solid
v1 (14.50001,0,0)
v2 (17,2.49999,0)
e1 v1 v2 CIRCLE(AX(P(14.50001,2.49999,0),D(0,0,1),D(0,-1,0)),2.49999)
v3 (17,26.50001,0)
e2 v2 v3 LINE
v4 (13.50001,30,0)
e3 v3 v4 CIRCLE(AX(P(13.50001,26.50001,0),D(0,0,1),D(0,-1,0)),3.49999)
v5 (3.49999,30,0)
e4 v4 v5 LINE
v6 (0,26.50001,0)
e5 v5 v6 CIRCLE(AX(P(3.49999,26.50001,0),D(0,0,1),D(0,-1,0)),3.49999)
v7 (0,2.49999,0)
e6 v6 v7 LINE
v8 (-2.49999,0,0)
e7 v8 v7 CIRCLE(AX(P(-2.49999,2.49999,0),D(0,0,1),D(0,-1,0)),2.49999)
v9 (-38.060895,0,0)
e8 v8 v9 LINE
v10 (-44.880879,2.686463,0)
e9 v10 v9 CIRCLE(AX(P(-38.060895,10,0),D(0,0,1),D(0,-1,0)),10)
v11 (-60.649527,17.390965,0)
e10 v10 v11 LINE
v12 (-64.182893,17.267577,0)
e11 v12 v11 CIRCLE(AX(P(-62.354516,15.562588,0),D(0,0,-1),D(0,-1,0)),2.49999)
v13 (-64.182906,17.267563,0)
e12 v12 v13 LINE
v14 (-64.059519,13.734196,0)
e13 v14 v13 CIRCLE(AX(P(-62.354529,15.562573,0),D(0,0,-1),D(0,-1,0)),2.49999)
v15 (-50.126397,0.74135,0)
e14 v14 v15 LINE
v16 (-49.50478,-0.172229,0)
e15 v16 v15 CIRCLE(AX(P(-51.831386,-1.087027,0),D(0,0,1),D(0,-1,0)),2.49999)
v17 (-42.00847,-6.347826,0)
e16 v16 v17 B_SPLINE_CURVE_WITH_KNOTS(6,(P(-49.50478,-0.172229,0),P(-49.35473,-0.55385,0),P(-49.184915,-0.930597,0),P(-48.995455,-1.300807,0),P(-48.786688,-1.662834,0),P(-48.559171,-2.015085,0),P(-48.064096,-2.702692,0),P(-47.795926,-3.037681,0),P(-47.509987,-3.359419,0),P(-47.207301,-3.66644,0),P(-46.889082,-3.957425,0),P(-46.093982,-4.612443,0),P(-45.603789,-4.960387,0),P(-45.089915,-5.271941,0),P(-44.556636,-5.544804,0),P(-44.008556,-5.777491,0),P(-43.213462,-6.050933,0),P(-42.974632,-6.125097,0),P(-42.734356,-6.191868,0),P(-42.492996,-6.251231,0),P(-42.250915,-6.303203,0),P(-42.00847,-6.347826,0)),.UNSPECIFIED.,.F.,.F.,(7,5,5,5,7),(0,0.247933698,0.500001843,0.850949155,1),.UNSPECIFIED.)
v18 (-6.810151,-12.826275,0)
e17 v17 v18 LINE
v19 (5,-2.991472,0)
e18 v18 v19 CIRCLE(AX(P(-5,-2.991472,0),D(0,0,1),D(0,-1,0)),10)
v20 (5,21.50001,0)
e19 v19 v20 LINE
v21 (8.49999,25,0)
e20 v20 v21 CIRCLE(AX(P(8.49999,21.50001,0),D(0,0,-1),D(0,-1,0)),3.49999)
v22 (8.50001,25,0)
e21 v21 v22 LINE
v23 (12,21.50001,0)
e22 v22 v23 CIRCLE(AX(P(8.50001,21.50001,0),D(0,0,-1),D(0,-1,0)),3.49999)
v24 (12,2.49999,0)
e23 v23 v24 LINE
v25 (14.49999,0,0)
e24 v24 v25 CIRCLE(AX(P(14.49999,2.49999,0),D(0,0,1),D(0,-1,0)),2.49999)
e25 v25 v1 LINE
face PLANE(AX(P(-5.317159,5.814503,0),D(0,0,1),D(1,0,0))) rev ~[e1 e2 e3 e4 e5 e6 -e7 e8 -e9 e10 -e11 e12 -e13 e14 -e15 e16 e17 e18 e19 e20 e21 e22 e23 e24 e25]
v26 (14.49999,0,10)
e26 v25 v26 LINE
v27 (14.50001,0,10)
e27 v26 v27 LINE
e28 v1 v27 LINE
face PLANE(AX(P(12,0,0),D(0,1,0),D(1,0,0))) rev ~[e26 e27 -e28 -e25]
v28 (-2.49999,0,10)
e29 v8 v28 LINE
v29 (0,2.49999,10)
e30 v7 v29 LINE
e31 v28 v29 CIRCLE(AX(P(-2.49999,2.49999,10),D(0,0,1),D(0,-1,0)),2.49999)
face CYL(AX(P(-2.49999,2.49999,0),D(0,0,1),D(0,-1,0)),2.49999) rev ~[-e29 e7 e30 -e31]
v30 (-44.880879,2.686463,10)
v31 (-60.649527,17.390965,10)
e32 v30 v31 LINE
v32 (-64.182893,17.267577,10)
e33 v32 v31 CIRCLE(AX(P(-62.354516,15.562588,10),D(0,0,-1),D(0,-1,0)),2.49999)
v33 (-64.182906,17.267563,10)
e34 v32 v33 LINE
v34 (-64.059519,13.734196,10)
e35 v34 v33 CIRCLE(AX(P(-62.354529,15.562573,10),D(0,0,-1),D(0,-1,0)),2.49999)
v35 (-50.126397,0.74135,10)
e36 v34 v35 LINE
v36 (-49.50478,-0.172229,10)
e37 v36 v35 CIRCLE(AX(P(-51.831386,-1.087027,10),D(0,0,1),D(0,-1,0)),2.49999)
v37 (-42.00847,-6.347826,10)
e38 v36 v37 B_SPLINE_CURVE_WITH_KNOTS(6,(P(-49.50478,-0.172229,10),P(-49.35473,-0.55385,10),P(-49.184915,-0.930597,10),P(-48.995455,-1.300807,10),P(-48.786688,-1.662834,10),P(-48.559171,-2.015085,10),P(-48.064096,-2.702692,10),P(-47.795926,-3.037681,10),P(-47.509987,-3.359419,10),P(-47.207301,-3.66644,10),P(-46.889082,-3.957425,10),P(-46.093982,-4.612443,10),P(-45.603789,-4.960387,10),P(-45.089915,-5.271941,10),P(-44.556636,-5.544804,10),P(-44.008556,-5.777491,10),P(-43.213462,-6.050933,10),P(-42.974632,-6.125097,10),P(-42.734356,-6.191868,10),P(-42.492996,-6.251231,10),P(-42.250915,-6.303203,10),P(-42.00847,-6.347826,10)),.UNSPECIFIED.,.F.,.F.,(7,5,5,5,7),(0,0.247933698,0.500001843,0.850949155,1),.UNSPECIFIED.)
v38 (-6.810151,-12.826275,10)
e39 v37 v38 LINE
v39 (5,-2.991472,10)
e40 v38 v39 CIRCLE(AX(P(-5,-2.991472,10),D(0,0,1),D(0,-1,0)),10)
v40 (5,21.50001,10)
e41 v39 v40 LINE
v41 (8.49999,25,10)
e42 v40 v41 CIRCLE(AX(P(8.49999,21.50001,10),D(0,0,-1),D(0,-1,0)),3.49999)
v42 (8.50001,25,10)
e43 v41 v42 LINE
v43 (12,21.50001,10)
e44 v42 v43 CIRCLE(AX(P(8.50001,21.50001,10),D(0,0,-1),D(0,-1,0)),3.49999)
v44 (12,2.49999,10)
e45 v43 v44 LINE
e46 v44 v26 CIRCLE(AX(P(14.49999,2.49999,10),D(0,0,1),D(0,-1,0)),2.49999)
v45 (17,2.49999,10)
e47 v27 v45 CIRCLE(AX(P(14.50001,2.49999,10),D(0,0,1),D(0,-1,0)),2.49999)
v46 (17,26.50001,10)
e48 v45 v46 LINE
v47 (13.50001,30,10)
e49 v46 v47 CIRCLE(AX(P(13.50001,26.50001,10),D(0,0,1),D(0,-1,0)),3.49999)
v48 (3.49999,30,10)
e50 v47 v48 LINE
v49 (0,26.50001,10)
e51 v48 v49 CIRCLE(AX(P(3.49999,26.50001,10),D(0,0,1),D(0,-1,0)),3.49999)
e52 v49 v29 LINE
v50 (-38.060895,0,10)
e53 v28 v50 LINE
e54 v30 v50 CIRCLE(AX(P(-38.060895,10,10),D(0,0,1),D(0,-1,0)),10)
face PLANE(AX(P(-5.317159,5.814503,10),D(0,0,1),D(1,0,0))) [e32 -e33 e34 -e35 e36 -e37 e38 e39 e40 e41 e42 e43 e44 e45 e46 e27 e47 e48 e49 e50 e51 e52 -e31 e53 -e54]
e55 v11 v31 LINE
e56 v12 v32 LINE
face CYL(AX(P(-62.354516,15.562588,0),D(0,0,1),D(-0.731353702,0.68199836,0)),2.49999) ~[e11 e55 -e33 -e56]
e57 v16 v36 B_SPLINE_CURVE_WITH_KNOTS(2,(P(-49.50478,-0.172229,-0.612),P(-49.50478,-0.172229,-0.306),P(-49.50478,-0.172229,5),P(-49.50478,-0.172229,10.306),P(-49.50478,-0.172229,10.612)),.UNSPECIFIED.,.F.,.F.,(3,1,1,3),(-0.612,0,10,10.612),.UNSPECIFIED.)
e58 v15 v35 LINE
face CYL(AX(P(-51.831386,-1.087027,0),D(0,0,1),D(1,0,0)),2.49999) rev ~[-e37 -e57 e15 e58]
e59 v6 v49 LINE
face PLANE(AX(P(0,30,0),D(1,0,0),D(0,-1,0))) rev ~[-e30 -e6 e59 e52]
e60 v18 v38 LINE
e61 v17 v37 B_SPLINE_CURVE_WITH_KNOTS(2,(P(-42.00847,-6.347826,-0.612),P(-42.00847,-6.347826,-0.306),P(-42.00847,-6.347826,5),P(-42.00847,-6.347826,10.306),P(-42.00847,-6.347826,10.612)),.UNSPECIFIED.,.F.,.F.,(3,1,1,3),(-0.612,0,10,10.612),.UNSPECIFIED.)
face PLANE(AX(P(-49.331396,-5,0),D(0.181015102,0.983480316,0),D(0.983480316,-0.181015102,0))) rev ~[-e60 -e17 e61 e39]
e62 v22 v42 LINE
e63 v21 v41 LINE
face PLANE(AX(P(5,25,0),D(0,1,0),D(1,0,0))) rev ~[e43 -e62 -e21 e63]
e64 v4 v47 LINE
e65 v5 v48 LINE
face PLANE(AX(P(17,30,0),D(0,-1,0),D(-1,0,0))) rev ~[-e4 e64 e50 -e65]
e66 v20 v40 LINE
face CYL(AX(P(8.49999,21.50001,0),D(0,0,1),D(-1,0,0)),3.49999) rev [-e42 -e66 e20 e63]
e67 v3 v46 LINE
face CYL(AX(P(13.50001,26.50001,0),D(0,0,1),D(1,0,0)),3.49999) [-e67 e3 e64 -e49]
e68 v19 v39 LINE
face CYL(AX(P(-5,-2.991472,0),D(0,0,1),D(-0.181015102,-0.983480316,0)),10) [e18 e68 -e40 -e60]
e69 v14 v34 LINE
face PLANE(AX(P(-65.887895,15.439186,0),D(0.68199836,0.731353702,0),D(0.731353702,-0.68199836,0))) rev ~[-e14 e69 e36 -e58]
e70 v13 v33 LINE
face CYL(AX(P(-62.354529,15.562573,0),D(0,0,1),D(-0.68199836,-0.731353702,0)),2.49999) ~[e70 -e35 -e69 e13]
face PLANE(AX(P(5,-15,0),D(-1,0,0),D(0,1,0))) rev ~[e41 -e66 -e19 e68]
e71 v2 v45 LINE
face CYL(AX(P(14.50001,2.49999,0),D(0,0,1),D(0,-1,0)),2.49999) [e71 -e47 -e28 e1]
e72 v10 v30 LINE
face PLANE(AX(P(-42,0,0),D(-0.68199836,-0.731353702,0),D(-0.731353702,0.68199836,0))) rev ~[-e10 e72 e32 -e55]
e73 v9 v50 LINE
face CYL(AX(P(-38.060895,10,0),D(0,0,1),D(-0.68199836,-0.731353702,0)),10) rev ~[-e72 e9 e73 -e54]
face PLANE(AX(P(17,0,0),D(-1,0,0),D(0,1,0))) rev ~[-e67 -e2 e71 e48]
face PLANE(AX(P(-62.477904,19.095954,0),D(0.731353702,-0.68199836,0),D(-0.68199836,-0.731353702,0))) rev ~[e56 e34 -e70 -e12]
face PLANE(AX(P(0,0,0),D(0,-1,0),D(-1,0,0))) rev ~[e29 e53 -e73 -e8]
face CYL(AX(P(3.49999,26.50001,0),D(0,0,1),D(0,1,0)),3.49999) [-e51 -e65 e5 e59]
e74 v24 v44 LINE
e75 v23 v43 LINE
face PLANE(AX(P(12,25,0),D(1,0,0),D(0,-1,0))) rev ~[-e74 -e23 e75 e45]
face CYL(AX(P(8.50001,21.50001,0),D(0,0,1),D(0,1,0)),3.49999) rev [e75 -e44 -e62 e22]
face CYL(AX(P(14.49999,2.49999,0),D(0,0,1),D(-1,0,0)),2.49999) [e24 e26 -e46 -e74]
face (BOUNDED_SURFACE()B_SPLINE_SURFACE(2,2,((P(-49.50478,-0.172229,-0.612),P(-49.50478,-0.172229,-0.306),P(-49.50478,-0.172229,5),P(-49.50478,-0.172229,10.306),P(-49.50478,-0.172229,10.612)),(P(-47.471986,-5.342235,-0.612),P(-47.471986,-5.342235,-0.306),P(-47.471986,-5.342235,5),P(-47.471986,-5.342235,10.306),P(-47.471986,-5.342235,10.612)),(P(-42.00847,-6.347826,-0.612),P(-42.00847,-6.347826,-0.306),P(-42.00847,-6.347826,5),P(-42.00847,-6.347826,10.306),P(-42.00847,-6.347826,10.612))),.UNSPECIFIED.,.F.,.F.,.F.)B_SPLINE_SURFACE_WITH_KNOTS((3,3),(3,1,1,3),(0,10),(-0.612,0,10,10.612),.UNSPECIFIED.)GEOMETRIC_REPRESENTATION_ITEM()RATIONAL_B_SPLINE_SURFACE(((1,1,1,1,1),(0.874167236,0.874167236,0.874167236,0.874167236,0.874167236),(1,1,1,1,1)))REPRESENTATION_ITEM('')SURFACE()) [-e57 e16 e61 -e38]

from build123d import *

# Parameters (mm, degrees)
F1_DEPTH = 10
F2_R     = 3.49999
F3_R     = 2.49999
F4_R     = 10


# Not quite as in the source:
# - a fillet or chamfer is up to 0.001 mm smaller than in the source, because OpenCascade refuses the exact size


with BuildPart() as f1:
    # F0 (on Top) → F1 (new body)
    with BuildSketch(Plane.XY):
        Polygon((5, -15), (5, 0), (5, 25), (12, 25), (12, 0), (17, 0), (17, 30), (0, 30), (0, 0), (-42, 0), (-49.3313959282, 0), (-49.3313959282, -5), align=None)
        Polygon((-65.8878954456, 15.4391855737), (-49.3313959282, 0), (-42, 0), (-62.4779036453, 19.0959540817), align=None)
    extrude(amount=F1_DEPTH)

    # F2 (radius 3.5 in the source; OpenCascade refuses exactly that, so slightly less here)
    f2_edges = [f1.edges().sort_by_distance(p)[0] for p in [
        (5, 25, 5),
        (12, 25, 5),
        (0, 30, 5),
        (17, 30, 5),
    ]]
    fillet(f2_edges, radius=F2_R)

    # F3 (radius 2.5 in the source; OpenCascade refuses exactly that, so slightly less here)
    f3_edges = [f1.edges().sort_by_distance(p)[0] for p in [
        (0, 0, 5),
        (17, 0, 5),
        (12, 0, 5),
        (-49.331396, 0, 5),
        (-62.477904, 19.095954, 5),
        (-65.887895, 15.439186, 5),
    ]]
    fillet(f3_edges, radius=F3_R)

    # F4
    f4_edges = [f1.edges().sort_by_distance(p)[0] for p in [
        (-2.49999, 0, 5),
        (5, -15, 5),
        (-49.331396, -5, 5),
        (-42, 0, 5),
    ]]
    fillet(f4_edges, radius=F4_R)


solid = f1.part
